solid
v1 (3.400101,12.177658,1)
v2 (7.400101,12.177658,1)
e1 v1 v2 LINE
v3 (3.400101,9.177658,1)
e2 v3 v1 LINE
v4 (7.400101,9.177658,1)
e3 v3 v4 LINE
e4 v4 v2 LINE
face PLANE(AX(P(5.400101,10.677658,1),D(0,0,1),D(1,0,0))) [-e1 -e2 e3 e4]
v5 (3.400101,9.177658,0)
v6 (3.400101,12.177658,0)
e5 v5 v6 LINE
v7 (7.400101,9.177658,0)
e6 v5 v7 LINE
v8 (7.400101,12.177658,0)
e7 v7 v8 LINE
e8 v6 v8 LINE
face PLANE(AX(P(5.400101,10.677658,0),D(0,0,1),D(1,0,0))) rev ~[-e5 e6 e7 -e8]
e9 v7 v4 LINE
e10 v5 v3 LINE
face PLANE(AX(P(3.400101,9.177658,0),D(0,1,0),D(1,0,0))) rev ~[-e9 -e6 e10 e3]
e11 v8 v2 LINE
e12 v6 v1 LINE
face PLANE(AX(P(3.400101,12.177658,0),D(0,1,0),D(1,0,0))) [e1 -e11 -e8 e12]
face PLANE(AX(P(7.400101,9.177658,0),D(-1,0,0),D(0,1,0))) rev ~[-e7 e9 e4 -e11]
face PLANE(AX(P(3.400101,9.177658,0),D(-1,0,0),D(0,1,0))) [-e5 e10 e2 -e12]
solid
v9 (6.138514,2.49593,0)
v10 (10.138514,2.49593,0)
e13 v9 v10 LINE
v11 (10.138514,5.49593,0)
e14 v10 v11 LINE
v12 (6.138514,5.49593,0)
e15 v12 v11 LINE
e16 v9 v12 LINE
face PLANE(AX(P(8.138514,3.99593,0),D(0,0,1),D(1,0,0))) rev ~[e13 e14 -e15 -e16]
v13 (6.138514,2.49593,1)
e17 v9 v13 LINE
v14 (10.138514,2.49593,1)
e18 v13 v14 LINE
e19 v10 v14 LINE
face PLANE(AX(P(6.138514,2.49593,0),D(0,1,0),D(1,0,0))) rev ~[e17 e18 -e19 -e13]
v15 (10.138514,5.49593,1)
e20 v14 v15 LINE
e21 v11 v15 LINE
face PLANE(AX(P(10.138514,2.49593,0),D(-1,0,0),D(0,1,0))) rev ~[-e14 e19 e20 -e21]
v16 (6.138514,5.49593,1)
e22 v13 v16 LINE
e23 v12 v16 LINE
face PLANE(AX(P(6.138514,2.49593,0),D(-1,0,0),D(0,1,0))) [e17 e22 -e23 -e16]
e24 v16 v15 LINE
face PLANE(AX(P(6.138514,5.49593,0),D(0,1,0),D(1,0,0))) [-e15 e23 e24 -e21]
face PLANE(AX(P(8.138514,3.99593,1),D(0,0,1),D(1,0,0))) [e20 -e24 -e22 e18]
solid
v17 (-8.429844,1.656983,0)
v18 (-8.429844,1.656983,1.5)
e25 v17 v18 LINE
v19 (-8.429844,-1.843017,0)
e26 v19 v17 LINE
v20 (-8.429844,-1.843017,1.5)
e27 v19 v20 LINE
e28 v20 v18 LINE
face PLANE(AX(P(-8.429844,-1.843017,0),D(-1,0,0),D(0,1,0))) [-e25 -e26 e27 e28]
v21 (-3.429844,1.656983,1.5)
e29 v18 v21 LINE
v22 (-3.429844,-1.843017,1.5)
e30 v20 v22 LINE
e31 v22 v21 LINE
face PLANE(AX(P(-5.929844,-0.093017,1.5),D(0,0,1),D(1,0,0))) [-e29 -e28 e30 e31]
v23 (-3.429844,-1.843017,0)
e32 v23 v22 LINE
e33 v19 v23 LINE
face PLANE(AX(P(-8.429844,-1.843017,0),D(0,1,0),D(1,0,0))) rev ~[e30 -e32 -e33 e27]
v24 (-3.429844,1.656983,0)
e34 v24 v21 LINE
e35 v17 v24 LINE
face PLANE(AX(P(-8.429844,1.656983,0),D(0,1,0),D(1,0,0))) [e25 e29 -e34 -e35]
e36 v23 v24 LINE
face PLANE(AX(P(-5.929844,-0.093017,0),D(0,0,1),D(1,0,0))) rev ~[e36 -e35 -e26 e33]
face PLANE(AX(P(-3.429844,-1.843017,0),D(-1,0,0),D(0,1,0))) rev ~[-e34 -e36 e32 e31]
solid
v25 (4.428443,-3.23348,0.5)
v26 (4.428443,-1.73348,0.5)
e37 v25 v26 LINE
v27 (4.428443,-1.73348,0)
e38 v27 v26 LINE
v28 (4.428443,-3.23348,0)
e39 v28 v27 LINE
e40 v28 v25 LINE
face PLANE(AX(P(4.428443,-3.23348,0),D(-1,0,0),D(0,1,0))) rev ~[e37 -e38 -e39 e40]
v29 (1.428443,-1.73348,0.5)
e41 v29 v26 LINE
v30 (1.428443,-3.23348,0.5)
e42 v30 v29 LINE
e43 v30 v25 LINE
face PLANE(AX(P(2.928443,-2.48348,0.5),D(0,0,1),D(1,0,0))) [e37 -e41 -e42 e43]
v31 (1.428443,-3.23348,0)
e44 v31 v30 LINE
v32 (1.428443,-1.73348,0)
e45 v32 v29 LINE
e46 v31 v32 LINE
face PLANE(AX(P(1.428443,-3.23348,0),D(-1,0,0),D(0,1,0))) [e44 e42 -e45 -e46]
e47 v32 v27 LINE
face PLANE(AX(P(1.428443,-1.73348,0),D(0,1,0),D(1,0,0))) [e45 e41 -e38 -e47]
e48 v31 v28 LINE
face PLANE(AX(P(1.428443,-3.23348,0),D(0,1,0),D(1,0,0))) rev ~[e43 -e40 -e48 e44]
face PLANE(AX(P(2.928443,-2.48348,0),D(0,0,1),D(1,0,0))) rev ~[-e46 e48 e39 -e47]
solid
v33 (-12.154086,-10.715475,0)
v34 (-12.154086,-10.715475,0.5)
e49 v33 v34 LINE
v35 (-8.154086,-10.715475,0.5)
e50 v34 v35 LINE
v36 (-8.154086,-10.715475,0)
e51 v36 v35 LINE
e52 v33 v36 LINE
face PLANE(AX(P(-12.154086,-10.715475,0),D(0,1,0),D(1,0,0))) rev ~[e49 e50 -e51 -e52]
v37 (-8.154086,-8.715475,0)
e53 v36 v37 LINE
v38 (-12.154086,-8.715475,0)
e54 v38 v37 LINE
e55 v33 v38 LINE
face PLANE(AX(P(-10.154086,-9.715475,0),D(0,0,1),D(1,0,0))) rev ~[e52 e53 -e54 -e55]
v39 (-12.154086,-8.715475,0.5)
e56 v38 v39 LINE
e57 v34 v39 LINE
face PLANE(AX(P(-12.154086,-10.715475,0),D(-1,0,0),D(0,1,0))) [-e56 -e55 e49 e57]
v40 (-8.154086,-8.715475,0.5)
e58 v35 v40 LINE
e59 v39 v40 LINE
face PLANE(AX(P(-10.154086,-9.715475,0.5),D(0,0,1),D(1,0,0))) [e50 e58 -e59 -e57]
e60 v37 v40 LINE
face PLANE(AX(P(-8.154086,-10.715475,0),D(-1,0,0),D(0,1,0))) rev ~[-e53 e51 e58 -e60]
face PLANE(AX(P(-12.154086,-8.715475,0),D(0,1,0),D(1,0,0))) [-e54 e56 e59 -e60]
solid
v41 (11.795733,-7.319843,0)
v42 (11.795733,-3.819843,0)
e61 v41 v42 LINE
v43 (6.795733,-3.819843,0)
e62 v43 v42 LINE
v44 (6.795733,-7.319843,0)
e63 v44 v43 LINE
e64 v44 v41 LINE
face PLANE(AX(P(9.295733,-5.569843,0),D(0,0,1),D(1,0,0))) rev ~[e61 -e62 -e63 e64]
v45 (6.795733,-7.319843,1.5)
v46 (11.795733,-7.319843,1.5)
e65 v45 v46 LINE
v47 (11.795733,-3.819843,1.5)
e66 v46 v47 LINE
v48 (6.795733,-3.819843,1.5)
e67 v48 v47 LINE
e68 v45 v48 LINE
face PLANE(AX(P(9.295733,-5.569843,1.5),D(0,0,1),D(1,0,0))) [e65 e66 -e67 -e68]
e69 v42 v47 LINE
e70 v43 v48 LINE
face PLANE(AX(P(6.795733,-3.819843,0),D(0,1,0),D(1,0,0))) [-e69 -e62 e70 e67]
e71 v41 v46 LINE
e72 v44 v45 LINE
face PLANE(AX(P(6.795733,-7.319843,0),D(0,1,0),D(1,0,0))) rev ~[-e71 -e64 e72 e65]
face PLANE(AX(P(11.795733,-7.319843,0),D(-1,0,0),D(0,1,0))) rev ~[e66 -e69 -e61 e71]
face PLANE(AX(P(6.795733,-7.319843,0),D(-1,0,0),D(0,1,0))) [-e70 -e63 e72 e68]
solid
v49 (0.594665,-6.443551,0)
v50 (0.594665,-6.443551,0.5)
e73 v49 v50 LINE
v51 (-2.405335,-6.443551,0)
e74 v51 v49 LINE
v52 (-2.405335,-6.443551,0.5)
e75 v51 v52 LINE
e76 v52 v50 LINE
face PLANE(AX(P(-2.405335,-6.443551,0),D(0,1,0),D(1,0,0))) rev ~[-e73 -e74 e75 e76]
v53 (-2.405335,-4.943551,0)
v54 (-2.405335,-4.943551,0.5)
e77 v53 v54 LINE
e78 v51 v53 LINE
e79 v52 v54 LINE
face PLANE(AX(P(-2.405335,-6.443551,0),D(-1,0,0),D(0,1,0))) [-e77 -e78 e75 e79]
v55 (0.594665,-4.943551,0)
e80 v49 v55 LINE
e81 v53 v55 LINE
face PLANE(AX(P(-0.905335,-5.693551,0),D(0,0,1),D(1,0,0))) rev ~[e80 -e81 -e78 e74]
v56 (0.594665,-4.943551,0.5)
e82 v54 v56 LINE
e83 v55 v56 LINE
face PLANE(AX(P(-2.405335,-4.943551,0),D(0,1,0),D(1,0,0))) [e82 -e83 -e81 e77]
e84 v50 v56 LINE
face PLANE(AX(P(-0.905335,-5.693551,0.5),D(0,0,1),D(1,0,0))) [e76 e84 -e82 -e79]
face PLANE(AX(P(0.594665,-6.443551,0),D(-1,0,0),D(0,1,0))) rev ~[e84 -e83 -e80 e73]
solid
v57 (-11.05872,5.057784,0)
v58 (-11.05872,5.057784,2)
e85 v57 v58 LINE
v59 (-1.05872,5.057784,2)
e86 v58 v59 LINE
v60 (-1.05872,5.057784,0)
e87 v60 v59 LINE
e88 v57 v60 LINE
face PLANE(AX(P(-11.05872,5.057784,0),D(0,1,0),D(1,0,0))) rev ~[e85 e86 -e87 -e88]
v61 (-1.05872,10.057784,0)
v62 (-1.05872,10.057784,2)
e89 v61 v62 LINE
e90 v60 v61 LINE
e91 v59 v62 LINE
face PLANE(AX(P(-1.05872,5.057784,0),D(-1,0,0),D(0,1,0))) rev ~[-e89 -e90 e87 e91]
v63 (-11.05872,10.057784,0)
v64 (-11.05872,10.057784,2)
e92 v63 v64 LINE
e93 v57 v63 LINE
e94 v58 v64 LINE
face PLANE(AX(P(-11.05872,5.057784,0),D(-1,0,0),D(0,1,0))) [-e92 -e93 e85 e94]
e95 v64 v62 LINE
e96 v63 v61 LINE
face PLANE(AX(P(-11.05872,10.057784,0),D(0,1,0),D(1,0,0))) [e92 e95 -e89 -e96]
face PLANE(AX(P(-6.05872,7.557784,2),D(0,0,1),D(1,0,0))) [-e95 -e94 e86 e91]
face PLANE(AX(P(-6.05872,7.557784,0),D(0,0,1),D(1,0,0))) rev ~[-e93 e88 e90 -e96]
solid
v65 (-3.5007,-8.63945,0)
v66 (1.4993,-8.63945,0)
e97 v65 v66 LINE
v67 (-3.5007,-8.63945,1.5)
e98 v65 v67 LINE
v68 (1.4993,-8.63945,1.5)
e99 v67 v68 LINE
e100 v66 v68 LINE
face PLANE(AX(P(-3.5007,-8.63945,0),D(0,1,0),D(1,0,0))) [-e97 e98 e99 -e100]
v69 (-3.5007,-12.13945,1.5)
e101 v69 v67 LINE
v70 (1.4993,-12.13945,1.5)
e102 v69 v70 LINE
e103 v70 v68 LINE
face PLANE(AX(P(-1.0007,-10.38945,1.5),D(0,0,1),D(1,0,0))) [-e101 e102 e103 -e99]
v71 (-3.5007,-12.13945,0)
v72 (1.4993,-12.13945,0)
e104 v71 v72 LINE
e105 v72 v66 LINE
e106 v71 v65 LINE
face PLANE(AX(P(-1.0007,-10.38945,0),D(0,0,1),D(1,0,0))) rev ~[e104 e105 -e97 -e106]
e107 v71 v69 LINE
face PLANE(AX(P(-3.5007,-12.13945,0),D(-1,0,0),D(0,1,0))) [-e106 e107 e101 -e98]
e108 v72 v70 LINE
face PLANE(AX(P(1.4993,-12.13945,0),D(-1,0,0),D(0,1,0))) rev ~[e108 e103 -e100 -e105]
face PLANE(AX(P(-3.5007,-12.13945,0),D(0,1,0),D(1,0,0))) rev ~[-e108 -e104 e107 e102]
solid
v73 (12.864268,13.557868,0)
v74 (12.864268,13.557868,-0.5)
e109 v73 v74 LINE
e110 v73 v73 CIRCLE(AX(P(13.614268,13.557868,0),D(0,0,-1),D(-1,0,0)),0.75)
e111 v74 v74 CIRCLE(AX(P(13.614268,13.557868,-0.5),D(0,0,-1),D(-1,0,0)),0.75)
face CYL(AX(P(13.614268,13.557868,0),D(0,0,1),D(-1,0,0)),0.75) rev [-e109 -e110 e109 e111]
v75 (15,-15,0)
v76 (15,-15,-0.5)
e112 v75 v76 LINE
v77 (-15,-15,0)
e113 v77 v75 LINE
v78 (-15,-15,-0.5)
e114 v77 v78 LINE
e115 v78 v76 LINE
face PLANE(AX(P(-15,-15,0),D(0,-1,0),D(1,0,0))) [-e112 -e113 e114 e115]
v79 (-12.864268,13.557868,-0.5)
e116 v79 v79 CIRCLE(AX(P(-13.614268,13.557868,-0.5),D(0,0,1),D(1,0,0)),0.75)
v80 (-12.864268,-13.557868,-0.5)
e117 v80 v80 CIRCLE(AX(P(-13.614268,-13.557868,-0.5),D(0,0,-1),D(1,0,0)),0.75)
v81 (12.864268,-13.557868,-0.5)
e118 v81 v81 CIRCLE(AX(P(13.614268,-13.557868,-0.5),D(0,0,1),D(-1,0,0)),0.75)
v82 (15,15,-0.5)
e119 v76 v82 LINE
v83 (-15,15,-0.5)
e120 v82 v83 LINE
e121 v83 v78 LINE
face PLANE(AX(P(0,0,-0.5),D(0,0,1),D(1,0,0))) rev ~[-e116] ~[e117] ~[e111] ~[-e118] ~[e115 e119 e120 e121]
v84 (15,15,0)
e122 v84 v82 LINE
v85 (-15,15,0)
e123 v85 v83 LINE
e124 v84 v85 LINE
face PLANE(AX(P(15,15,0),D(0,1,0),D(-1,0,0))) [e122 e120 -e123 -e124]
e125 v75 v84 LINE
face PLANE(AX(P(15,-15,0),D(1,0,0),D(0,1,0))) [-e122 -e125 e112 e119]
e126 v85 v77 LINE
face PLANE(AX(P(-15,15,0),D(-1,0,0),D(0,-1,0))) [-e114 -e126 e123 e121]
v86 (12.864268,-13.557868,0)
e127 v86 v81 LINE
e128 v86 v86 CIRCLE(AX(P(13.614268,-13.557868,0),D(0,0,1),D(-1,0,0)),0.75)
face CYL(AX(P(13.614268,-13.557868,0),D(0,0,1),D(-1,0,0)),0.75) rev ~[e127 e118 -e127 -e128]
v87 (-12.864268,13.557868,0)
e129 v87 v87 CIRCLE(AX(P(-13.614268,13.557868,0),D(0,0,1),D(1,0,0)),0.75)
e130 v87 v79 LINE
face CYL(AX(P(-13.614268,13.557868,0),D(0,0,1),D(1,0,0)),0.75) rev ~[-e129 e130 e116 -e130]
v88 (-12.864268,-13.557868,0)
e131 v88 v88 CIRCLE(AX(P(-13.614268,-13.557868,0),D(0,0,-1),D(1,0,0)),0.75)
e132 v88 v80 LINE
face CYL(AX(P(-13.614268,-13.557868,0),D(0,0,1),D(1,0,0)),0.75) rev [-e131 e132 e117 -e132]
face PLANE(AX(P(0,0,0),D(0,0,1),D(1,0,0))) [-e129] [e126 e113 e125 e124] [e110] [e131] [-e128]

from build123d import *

# Parameters (mm, degrees)
F0_W      = 4
F0_H      = 2
F0_W_2    = 5
F0_H_2    = 3.5
F0_W_3    = 3
F0_H_3    = 1.5
F0_R      = 0.75
F0_W_4    = 10
F0_H_4    = 5
F0_H_5    = 3
F1_DEPTH  = 0.5
F2_DEPTH  = 0.5
F7_DEPTH  = 2
F8_DEPTH  = 1.5
F9_DEPTH  = 1
F10_DEPTH = 0.5


# Not quite as in the source:
# - the program builds the solid bodies; features that only make, move or delete a surface that nothing else refers to are left out


with BuildPart() as f1:
    # F0 (on Top) → F1 (new body)
    with BuildSketch(Plane.XY):
        Polygon((15, 15), (0, 15), (-15, 15), (-15, 0), (-15, -15), (15, -15), (15, 0), align=None)
        with Locations((-10.1540855616, -9.7154753059)):
            Rectangle(F0_W, F0_H, mode=Mode.SUBTRACT)
        with Locations((-1.0007002298, -10.3894498274)):
            Rectangle(F0_W_2, F0_H_2, mode=Mode.SUBTRACT)
        with Locations((-0.9053347297, -5.6935508102)):
            Rectangle(F0_W_3, F0_H_3, mode=Mode.SUBTRACT)
        with Locations((-5.9298439324, -0.0930169439)):
            Rectangle(F0_W_2, F0_H_2, mode=Mode.SUBTRACT)
        with Locations((2.9284434728, -2.4834803706)):
            Rectangle(F0_W_3, F0_H_3, mode=Mode.SUBTRACT)
        with Locations((9.2957332358, -5.5698433965)):
            Rectangle(F0_W_2, F0_H_2, mode=Mode.SUBTRACT)
        with Locations((-13.6142675997, 13.55786765)):
            Circle(F0_R, mode=Mode.SUBTRACT)
        with Locations((-6.0587198287, 7.557784263)):
            Rectangle(F0_W_4, F0_H_4, mode=Mode.SUBTRACT)
        with Locations((8.1385142617, 3.9959300905)):
            Rectangle(F0_W, F0_H_5, mode=Mode.SUBTRACT)
        with Locations((5.4001008607, 10.6776582673)):
            Rectangle(F0_W, F0_H_5, mode=Mode.SUBTRACT)
        with Locations((-6.0587198287, 7.557784263)):
            Rectangle(F0_W_4, F0_H_4)
        with Locations((-5.9298439324, -0.0930169439)):
            Rectangle(F0_W_2, F0_H_2)
        with Locations((-10.1540855616, -9.7154753059)):
            Rectangle(F0_W, F0_H)
        with Locations((-1.0007002298, -10.3894498274)):
            Rectangle(F0_W_2, F0_H_2)
        with Locations((-0.9053347297, -5.6935508102)):
            Rectangle(F0_W_3, F0_H_3)
        with Locations((2.9284434728, -2.4834803706)):
            Rectangle(F0_W_3, F0_H_3)
        with Locations((9.2957332358, -5.5698433965)):
            Rectangle(F0_W_2, F0_H_2)
        with Locations((8.1385142617, 3.9959300905)):
            Rectangle(F0_W, F0_H_5)
        with Locations((5.4001008607, 10.6776582673)):
            Rectangle(F0_W, F0_H_5)
    extrude(amount=-F1_DEPTH)


with BuildPart() as f2:
    # F0 (on Top) → F2 (new body, through all)
    with BuildSketch(Plane.XY):
        with Locations((-13.6142675997, 13.55786765)):
            Circle(F0_R)
    extrude(amount=-F2_DEPTH)


with BuildPart() as f3_1:
    # F3: instance of F2
    add(f2.part.mirror(Plane.XZ))


with BuildPart() as f4_1:
    # F4: instance of F2
    add(f2.part.mirror(Plane.YZ))


with BuildPart() as f4_2:
    # F4: instance of F3_1
    add(f3_1.part.mirror(Plane.YZ))


with BuildPart() as f1_1:
    add(f1.part)

    # F5: cut F3_1, F4_1, F4_2
    add(f3_1.part, mode=Mode.SUBTRACT)
    add(f4_1.part, mode=Mode.SUBTRACT)
    add(f4_2.part, mode=Mode.SUBTRACT)


with BuildPart() as f7:
    # F0 (on Top) → F7 (new body)
    with BuildSketch(Plane.XY):
        with Locations((-6.0587198287, 7.557784263)):
            Rectangle(F0_W_4, F0_H_4)
    extrude(amount=F7_DEPTH)


with BuildPart() as f8:
    # F0 (on Top) → F8 (new body)
    with BuildSketch(Plane.XY):
        with Locations((-5.9298439324, -0.0930169439)):
            Rectangle(F0_W_2, F0_H_2)
    extrude(amount=F8_DEPTH)


with BuildPart() as f8b:
    # F0 (on Top) → F8, piece 2 (new body)
    with BuildSketch(Plane.XY):
        with Locations((-1.0007002298, -10.3894498274)):
            Rectangle(F0_W_2, F0_H_2)
    extrude(amount=F8_DEPTH)


with BuildPart() as f8c:
    # F0 (on Top) → F8, piece 3 (new body)
    with BuildSketch(Plane.XY):
        with Locations((9.2957332358, -5.5698433965)):
            Rectangle(F0_W_2, F0_H_2)
    extrude(amount=F8_DEPTH)


with BuildPart() as f9:
    # F0 (on Top) → F9 (new body)
    with BuildSketch(Plane.XY):
        with Locations((8.1385142617, 3.9959300905)):
            Rectangle(F0_W, F0_H_5)
    extrude(amount=F9_DEPTH)


with BuildPart() as f9b:
    # F0 (on Top) → F9, piece 2 (new body)
    with BuildSketch(Plane.XY):
        with Locations((5.4001008607, 10.6776582673)):
            Rectangle(F0_W, F0_H_5)
    extrude(amount=F9_DEPTH)


with BuildPart() as f10:
    # F0 (on Top) → F10 (new body)
    with BuildSketch(Plane.XY):
        with Locations((-0.9053347297, -5.6935508102)):
            Rectangle(F0_W_3, F0_H_3)
    extrude(amount=F10_DEPTH)


with BuildPart() as f10b:
    # F0 (on Top) → F10, piece 2 (new body)
    with BuildSketch(Plane.XY):
        with Locations((2.9284434728, -2.4834803706)):
            Rectangle(F0_W_3, F0_H_3)
    extrude(amount=F10_DEPTH)


with BuildPart() as f10c:
    # F0 (on Top) → F10, piece 3 (new body)
    with BuildSketch(Plane.XY):
        with Locations((-10.1540855616, -9.7154753059)):
            Rectangle(F0_W, F0_H)
    extrude(amount=F10_DEPTH)


solid = Compound([f1_1.part, f7.part, f8.part, f8b.part, f8c.part, f9.part, f9b.part, f10.part, f10b.part, f10c.part])
